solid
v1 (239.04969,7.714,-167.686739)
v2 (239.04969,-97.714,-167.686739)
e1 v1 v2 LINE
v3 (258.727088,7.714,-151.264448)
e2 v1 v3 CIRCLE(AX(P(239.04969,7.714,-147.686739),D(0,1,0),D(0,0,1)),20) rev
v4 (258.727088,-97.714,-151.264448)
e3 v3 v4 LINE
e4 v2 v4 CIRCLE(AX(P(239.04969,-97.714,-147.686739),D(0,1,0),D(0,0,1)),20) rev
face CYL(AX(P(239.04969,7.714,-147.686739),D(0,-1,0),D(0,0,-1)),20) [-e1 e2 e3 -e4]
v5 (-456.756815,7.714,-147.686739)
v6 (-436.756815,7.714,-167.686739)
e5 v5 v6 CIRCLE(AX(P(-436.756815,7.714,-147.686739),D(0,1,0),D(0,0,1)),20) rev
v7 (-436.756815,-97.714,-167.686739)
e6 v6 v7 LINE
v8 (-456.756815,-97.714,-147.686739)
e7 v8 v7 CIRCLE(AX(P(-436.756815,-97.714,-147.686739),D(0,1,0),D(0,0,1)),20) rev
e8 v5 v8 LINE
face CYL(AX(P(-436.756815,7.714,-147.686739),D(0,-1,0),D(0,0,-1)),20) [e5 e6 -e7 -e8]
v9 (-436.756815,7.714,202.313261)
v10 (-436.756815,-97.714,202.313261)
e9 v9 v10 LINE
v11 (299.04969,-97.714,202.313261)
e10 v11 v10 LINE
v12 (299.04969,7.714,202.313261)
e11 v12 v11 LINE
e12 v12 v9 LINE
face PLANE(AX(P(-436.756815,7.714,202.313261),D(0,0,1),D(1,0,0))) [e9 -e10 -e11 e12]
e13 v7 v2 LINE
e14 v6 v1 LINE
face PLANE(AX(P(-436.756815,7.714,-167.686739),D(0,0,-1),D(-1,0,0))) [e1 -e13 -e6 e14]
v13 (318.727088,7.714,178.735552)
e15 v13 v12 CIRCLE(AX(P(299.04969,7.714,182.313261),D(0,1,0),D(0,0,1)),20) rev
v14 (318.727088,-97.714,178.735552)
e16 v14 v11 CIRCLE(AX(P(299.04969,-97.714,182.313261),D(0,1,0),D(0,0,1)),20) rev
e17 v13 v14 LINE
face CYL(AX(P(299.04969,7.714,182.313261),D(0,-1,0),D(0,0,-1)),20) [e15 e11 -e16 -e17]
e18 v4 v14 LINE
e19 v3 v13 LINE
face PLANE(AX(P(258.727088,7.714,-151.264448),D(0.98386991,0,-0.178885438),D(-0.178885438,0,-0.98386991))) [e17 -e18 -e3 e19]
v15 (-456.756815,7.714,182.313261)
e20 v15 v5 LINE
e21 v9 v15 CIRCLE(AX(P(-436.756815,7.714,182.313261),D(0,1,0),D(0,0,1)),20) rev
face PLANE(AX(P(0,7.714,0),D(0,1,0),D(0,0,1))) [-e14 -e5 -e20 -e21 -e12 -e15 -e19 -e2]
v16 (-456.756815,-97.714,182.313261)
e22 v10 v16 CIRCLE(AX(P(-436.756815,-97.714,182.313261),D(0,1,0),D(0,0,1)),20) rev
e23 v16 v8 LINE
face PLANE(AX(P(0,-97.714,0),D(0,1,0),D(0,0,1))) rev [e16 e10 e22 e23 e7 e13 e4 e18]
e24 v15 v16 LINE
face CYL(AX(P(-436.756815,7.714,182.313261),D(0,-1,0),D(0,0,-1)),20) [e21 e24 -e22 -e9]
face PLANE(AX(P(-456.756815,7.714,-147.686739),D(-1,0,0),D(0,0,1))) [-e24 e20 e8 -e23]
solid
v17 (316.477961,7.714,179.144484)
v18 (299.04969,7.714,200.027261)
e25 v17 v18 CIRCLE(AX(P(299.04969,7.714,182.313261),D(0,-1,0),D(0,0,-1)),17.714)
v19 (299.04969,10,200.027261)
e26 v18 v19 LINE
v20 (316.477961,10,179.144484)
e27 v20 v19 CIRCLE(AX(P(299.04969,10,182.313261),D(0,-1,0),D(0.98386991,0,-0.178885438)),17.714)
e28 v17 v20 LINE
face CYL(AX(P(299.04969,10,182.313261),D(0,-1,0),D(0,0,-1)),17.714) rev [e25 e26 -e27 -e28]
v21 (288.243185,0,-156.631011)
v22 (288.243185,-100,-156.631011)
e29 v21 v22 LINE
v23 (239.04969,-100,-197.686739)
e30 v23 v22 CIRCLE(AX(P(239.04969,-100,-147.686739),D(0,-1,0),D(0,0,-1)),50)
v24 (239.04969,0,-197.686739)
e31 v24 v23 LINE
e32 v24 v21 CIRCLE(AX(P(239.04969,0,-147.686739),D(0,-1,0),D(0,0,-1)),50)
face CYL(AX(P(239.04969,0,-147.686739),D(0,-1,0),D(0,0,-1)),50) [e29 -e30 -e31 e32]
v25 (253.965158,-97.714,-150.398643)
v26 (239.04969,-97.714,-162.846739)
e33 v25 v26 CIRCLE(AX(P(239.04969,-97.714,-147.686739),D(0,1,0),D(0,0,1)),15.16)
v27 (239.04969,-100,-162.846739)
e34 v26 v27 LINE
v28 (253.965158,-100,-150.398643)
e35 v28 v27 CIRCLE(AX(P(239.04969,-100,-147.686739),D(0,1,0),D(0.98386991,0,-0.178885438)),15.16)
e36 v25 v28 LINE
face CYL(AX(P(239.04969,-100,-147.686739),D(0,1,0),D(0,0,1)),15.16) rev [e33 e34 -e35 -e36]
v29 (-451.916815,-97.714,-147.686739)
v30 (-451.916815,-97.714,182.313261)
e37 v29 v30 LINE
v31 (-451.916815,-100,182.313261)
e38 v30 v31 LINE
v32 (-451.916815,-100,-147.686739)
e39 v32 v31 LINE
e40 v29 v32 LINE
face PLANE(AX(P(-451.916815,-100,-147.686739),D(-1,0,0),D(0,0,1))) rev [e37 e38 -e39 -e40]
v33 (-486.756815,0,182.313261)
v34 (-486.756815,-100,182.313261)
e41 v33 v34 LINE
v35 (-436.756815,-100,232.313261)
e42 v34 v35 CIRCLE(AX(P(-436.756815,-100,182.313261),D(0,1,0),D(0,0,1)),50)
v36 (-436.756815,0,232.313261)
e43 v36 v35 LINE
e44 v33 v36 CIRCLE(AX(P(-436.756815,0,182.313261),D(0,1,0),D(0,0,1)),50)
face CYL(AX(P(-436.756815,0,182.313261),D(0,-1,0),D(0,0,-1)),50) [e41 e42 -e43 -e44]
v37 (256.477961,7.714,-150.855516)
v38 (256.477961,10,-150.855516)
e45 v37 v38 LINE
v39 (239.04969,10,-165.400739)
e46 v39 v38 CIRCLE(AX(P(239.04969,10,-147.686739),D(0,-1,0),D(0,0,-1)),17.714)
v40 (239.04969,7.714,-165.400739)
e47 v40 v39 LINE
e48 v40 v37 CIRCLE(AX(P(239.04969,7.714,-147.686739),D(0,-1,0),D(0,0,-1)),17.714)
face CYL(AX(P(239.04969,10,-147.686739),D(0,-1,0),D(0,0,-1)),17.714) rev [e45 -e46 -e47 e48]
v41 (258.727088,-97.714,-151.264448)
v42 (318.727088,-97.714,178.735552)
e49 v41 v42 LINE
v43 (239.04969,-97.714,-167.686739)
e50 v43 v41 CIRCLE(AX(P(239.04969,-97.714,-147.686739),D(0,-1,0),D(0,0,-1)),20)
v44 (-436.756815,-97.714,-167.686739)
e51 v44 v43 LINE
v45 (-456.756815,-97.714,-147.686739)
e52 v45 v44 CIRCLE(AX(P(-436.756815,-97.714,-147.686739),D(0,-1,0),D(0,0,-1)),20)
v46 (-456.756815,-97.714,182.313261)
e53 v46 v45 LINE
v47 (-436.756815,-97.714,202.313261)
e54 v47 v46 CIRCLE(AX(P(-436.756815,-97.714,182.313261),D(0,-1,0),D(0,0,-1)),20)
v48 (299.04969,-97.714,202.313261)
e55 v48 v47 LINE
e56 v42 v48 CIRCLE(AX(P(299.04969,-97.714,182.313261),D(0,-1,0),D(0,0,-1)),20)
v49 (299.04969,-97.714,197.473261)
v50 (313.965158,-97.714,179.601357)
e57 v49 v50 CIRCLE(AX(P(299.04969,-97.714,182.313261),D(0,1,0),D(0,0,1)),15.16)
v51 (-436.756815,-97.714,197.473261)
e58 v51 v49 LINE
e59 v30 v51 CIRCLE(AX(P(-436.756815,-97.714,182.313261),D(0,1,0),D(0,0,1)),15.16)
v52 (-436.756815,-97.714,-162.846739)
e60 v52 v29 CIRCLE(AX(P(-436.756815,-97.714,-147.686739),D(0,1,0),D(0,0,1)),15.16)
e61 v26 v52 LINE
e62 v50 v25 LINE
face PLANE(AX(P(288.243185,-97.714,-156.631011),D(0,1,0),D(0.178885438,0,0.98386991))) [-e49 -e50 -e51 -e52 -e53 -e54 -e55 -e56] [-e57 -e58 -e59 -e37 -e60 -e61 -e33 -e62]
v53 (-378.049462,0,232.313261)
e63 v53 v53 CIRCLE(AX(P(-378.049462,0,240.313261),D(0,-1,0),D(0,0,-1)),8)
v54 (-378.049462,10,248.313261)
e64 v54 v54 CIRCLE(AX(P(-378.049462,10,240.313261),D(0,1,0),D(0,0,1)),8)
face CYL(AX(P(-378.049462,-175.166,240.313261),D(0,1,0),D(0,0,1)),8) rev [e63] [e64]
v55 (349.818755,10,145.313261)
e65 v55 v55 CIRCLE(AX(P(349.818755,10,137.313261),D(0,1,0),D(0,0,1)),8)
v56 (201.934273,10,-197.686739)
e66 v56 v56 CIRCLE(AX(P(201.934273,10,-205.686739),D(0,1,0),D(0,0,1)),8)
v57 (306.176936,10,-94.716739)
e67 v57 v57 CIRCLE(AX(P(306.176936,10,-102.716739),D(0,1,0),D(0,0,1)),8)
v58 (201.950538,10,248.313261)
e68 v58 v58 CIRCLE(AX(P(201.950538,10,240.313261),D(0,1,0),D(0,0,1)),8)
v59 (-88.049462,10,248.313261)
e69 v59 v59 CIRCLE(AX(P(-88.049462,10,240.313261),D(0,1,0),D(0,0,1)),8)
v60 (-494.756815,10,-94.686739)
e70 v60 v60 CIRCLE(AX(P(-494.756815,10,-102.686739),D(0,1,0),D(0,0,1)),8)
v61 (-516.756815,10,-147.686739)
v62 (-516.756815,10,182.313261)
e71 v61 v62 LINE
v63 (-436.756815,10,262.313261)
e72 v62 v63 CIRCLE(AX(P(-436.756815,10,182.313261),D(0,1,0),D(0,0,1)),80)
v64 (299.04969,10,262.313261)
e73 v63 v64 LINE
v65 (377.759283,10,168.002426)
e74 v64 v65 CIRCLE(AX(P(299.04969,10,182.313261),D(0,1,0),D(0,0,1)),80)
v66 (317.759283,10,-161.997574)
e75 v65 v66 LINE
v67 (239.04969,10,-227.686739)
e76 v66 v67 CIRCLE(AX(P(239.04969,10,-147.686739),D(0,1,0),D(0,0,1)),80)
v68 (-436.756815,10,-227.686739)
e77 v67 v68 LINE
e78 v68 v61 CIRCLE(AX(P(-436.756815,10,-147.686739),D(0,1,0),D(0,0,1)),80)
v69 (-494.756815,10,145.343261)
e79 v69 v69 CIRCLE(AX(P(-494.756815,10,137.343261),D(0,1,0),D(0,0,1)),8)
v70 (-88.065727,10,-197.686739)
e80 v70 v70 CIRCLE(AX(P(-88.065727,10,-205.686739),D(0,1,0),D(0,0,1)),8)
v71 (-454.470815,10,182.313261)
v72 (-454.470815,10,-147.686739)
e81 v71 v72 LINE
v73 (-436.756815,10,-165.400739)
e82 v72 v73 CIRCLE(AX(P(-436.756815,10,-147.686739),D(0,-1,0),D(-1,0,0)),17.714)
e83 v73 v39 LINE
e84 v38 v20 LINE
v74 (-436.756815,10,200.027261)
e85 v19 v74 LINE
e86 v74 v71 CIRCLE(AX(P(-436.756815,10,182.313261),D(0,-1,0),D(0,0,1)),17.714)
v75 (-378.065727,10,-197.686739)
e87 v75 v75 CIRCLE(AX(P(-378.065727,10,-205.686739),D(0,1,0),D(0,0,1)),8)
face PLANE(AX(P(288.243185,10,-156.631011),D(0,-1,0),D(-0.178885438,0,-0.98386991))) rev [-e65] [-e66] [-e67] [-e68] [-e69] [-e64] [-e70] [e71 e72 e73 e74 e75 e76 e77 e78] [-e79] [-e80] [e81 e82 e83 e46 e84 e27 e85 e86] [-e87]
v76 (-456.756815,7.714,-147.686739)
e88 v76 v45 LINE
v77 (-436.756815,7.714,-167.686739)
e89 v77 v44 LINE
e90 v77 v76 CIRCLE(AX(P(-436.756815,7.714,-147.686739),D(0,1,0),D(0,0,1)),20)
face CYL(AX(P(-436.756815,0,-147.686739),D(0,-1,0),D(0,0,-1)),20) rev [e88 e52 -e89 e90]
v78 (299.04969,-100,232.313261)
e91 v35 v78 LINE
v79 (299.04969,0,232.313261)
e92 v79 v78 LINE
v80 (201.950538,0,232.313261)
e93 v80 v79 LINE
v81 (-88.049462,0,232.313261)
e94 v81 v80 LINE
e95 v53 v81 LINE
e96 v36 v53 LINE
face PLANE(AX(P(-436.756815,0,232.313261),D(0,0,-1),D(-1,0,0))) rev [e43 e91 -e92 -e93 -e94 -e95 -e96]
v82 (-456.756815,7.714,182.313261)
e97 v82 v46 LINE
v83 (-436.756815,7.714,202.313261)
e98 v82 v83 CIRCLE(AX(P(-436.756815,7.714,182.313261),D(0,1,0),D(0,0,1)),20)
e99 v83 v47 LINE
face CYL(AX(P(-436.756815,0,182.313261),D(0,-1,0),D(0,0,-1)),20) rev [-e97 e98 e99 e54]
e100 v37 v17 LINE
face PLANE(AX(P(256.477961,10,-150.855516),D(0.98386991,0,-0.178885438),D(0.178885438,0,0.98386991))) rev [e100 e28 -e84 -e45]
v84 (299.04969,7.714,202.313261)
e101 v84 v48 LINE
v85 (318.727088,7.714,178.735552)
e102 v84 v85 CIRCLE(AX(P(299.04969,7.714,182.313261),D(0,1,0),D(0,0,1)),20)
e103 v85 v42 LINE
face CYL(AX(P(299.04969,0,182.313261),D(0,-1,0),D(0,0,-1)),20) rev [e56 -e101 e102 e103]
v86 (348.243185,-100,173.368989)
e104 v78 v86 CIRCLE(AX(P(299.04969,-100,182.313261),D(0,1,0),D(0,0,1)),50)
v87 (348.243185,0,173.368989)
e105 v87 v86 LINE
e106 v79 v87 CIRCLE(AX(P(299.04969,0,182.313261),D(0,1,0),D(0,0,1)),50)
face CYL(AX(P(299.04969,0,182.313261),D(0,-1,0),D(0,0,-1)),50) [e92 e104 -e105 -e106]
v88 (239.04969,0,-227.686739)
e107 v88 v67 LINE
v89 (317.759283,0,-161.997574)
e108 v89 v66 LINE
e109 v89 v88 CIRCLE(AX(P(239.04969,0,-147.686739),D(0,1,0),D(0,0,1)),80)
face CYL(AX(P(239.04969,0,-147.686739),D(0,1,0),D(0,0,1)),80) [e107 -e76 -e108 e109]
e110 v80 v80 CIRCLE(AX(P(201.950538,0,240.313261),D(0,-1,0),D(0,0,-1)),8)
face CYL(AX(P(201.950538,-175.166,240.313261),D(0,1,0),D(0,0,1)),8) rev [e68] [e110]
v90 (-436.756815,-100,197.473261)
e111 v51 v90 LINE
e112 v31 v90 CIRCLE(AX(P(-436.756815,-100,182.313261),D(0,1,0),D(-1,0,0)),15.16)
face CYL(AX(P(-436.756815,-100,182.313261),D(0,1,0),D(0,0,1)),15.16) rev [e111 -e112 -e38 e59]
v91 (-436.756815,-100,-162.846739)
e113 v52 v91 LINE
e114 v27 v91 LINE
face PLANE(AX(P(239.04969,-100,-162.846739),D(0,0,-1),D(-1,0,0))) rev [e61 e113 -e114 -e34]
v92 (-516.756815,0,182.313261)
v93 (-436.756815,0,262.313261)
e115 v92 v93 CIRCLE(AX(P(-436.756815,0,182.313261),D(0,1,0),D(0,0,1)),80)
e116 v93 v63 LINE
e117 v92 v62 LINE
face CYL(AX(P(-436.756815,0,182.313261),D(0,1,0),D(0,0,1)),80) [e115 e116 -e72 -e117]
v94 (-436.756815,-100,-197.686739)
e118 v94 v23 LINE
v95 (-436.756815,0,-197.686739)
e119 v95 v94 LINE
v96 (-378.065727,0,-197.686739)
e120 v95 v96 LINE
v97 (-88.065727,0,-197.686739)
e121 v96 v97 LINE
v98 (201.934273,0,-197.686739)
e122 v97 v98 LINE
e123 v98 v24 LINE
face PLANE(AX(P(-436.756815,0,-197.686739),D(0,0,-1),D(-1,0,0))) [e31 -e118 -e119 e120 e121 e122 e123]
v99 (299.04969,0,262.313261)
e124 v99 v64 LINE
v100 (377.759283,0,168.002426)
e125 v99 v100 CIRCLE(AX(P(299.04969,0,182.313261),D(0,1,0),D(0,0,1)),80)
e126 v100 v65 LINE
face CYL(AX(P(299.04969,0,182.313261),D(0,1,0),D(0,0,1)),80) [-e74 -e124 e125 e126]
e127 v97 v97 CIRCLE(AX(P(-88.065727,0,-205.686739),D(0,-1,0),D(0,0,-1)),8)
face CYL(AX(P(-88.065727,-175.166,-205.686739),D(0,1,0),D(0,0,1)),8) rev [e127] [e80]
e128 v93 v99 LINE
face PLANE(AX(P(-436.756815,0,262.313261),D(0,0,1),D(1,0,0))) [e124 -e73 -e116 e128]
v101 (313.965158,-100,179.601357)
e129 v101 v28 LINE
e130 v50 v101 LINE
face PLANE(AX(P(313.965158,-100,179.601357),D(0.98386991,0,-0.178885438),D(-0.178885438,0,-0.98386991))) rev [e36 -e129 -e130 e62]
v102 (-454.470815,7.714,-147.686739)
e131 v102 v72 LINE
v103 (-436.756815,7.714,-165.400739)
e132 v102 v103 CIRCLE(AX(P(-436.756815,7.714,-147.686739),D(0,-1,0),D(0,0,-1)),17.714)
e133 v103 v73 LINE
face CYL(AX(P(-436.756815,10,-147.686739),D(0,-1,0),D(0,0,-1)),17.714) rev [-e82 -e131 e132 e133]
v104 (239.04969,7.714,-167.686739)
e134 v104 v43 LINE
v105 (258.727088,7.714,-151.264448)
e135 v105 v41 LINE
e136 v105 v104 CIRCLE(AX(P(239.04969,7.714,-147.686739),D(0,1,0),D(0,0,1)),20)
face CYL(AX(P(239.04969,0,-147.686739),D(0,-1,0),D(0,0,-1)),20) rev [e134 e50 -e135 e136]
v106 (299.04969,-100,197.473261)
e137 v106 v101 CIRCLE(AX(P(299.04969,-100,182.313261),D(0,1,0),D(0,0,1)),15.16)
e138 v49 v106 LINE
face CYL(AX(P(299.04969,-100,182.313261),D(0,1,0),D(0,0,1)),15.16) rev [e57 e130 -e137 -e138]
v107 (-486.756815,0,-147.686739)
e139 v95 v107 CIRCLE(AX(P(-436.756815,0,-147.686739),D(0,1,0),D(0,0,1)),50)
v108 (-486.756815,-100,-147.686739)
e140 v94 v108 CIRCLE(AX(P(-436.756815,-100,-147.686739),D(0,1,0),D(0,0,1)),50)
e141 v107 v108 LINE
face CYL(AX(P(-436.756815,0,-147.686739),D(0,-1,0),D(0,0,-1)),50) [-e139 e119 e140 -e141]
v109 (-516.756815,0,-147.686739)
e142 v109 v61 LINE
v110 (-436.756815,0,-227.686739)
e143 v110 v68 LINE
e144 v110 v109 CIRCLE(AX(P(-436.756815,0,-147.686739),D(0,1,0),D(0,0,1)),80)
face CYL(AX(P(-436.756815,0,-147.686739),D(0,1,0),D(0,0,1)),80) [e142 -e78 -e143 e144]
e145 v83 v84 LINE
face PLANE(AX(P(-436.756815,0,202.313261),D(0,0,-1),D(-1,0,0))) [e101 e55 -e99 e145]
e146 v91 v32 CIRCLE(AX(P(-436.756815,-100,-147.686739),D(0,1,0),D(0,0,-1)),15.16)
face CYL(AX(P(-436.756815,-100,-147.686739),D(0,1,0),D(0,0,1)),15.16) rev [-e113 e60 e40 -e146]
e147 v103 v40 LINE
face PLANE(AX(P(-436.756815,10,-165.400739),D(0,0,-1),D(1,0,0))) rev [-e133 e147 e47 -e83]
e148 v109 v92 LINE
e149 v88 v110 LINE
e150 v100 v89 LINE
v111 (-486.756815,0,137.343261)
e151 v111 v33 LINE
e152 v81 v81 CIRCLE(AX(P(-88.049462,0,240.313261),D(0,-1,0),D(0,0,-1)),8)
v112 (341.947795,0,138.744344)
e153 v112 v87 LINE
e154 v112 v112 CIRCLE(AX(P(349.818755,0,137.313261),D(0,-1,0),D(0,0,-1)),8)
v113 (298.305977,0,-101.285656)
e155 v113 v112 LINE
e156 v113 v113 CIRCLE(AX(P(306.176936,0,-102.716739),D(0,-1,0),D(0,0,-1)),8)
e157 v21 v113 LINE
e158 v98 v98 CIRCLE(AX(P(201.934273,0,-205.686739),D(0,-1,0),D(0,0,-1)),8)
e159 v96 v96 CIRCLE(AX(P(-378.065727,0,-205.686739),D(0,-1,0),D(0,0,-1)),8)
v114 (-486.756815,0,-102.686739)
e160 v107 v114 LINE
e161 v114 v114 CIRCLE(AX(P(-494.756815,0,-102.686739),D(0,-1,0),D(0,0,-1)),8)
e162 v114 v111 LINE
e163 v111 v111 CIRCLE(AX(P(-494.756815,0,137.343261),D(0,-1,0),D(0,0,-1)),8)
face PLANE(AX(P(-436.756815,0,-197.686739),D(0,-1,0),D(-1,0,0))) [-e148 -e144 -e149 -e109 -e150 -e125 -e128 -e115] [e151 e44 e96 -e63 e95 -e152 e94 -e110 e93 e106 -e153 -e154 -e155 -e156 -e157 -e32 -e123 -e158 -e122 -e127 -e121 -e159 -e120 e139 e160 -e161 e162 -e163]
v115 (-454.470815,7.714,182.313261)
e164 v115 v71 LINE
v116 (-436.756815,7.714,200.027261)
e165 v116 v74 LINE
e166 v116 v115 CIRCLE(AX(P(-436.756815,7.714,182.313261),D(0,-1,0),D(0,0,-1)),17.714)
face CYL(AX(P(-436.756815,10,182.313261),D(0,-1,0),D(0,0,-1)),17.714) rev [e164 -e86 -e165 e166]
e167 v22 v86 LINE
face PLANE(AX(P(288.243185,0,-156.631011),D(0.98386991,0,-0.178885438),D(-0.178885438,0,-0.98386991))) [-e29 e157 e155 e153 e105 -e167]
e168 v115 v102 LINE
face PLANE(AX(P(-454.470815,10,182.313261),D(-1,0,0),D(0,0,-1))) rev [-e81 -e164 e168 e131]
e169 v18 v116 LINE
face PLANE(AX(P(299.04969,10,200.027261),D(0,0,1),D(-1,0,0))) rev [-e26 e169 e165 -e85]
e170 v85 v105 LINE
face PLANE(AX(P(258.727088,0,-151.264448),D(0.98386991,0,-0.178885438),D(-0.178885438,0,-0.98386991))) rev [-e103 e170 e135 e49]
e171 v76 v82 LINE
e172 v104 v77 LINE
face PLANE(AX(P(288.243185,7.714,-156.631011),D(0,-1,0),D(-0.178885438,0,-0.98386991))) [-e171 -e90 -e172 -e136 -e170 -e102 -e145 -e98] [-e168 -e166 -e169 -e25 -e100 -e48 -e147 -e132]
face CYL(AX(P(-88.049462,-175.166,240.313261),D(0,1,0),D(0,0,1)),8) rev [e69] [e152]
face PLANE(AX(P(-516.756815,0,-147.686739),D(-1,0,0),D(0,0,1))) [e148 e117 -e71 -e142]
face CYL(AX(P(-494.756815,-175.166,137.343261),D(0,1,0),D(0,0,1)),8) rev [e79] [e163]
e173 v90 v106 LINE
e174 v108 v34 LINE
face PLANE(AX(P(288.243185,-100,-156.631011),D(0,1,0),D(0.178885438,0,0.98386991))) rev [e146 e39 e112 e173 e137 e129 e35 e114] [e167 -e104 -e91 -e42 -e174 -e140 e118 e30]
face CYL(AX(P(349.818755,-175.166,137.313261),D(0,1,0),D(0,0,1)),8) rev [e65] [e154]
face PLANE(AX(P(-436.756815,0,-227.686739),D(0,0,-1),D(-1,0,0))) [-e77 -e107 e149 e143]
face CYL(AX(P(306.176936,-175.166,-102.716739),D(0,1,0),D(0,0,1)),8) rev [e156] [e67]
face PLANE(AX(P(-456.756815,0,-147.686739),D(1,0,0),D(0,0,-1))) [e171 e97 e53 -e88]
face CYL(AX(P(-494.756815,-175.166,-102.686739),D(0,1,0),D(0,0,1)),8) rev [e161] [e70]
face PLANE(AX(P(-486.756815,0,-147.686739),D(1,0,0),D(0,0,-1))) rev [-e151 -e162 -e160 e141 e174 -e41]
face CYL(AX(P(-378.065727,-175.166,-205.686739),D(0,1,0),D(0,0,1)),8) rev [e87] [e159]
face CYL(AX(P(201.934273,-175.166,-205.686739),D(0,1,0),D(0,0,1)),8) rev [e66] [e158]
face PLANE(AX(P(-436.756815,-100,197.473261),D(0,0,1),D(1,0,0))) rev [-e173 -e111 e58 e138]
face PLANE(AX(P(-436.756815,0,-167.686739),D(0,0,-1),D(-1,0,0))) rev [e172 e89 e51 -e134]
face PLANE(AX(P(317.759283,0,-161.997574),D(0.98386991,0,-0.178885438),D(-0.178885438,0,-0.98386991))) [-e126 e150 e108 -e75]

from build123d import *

# Parameters (mm, degrees)
SURFACE_EXTRUDE1_1_BACK  = 100
SURFACE_EXTRUDE1_1_DEPTH = 100
THICKEN1_T1              = 30
SURFACE_EXTRUDE2_2_DEPTH = 10
THICKEN2_T1              = 30
THICKEN2_T2              = 30
SKETCH3_R                = 8
CUT_EXTRUDE1_DEPTH       = 185.166
THICKEN3_START           = -100
THICKEN3_DEPTH           = 2.286
THICKEN4_START           = 7.714
THICKEN4_DEPTH           = 2.286
THICKEN8_START           = -97.714
THICKEN8_DEPTH           = 105.427999964


# Read off the part's stored shape, not the designer's step: Thicken3, Thicken4, Thicken8
with BuildPart() as body_1:
    # Surface-Extrude1: a surface, the sketch's curves swept straight by 100 mm
    with BuildLine(Plane(origin=(0, 0, 0), x_dir=(1, 0, 0), z_dir=(0, 1, 0)).offset(-SURFACE_EXTRUDE1_1_BACK), mode=Mode.PRIVATE) as surface_extrude1_1_path:
        Line((-486.756814761, 147.686739346), (-486.756814761, -182.313260654))
        ThreePointArc((-486.756814761, -182.313260654), (-472.112153821, -217.668599714), (-436.756814761, -232.313260654))
        Line((-436.756814761, -232.313260654), (299.049689734, -232.313260654))
        ThreePointArc((299.049689734, -232.313260654), (337.43727624, -214.350632617), (348.243185239, -173.368988744))
        Line((348.243185239, -173.368988744), (288.243185239, 156.631011256))
        ThreePointArc((288.243185239, 156.631011256), (271.087061696, 186.074325852), (239.049689734, 197.686739346))
        Line((239.049689734, 197.686739346), (-436.756814761, 197.686739346))
        ThreePointArc((-436.756814761, 197.686739346), (-472.112153821, 183.042078405), (-486.756814761, 147.686739346))
    surface_extrude1_1 = Shell.extrude(surface_extrude1_1_path.wire(), (0 * SURFACE_EXTRUDE1_1_DEPTH, 1 * SURFACE_EXTRUDE1_1_DEPTH, 0 * SURFACE_EXTRUDE1_1_DEPTH))
    add(Solid.thicken(surface_extrude1_1, THICKEN1_T1))

    # Surface-Extrude2: a surface, the sketch's curves swept straight by 10 mm
    with BuildLine(Plane(origin=(0, 0, 0), x_dir=(1, 0, 0), z_dir=(0, 1, 0)), mode=Mode.PRIVATE) as surface_extrude2_2_path:
        Line((-486.756814761, 147.686739346), (-486.756814761, -182.313260654))
        ThreePointArc((-486.756814761, -182.313260654), (-472.112153821, -217.668599714), (-436.756814761, -232.313260654))
        Line((-436.756814761, -232.313260654), (299.049689734, -232.313260654))
        ThreePointArc((299.049689734, -232.313260654), (337.43727624, -214.350632617), (348.243185239, -173.368988744))
        Line((348.243185239, -173.368988744), (288.243185239, 156.631011256))
        ThreePointArc((288.243185239, 156.631011256), (271.087061696, 186.074325852), (239.049689734, 197.686739346))
        Line((239.049689734, 197.686739346), (-436.756814761, 197.686739346))
        ThreePointArc((-436.756814761, 197.686739346), (-472.112153821, 183.042078405), (-486.756814761, 147.686739346))
    surface_extrude2_2 = Shell.extrude(surface_extrude2_2_path.wire(), (0 * SURFACE_EXTRUDE2_2_DEPTH, 1 * SURFACE_EXTRUDE2_2_DEPTH, 0 * SURFACE_EXTRUDE2_2_DEPTH))
    add(Solid.thicken(surface_extrude2_2, THICKEN2_T1))
    add(Solid.thicken(surface_extrude2_2, -THICKEN2_T2))

    # Sketch3 → Cut-Extrude1 (cut)
    with BuildSketch(Plane(origin=(0, 10, 0), x_dir=(1, 0, 0), z_dir=(0, 1, 0))):
        with Locations(Location((-378.065726857, 205.686739346, 0), (0, 0, 270))):
            Circle(SKETCH3_R)
        with Locations(Location((-88.065726857, 205.686739346, 0), (0, 0, 270))):
            Circle(SKETCH3_R)
        with Locations(Location((201.934273143, 205.686739346, 0), (0, 0, 270))):
            Circle(SKETCH3_R)
        with Locations(Location((-494.756814761, 102.686739346, 0), (0, 0, 270))):
            Circle(SKETCH3_R)
        with Locations(Location((-494.756814761, -137.343260654, 0), (0, 0, 270))):
            Circle(SKETCH3_R)
        with Locations(Location((-378.049461671, -240.313260654, 0), (0, 0, 270))):
            Circle(SKETCH3_R)
        with Locations(Location((-88.049461789, -240.313260654, 0), (0, 0, 270))):
            Circle(SKETCH3_R)
        with Locations(Location((201.950538093, -240.313260654, 0), (0, 0, 270))):
            Circle(SKETCH3_R)
        with Locations(Location((306.176936413, 102.716739346, 0), (0, 0, 270))):
            Circle(SKETCH3_R)
        with Locations(Location((349.818754595, -137.313260654, 0), (0, 0, 270))):
            Circle(SKETCH3_R)
    extrude(amount=-CUT_EXTRUDE1_DEPTH, mode=Mode.SUBTRACT)

    # Thicken3 outline → Thicken3 (add)
    with BuildSketch(Plane(origin=(0, 0, 0), x_dir=(1, 0, 0), z_dir=(0, 1, 0)).offset(THICKEN3_START)):
        with BuildLine():
            ThreePointArc((299.049689734, -202.313260654), (314.404724336, -195.128209439), (318.727087936, -178.73555189))
            Line((318.727087936, -178.73555189), (258.727087936, 151.26444811))
            ThreePointArc((258.727087936, 151.26444811), (251.864638519, 163.041773948), (239.049689734, 167.686739346))
            Line((239.049689734, 167.686739346), (-436.756814761, 167.686739346))
            ThreePointArc((-436.756814761, 167.686739346), (-450.898950384, 161.828874969), (-456.756814761, 147.686739346))
            Line((-456.756814761, 147.686739346), (-456.756814761, -182.313260654))
            ThreePointArc((-456.756814761, -182.313260654), (-450.898950385, -196.455396278), (-436.756814761, -202.313260654))
            Line((-436.756814761, -202.313260654), (299.049689734, -202.313260654))
        make_face()
        with BuildLine():
            ThreePointArc((239.049689734, 162.846739374), (248.763420931, 159.325855596), (253.965157598, 150.398642594))
            Line((253.965157598, 150.398642594), (313.965157598, -179.601357406))
            ThreePointArc((313.965157598, -179.601357406), (310.688805984, -192.026991851), (299.049689734, -197.473260682))
            Line((299.049689734, -197.473260682), (-436.756814761, -197.473260682))
            ThreePointArc((-436.756814761, -197.473260682), (-447.476553584, -193.032999477), (-451.916814789, -182.313260654))
            Line((-451.916814789, -182.313260654), (-451.916814789, 147.686739346))
            ThreePointArc((-451.916814789, 147.686739346), (-447.476553583, 158.406478169), (-436.756814761, 162.846739374))
            Line((-436.756814761, 162.846739374), (239.049689734, 162.846739374))
        make_face(mode=Mode.SUBTRACT)
    extrude(amount=THICKEN3_DEPTH)

    # Thicken4 outline → Thicken4 (add)
    with BuildSketch(Plane(origin=(0, 0, 0), x_dir=(1, 0, 0), z_dir=(0, 1, 0)).offset(THICKEN4_START)):
        with BuildLine():
            ThreePointArc((299.049689734, -202.313260654), (314.404724336, -195.128209439), (318.727087936, -178.73555189))
            Line((318.727087936, -178.73555189), (258.727087936, 151.26444811))
            ThreePointArc((258.727087936, 151.26444811), (251.864638519, 163.041773948), (239.049689734, 167.686739346))
            Line((239.049689734, 167.686739346), (-436.756814761, 167.686739346))
            ThreePointArc((-436.756814761, 167.686739346), (-450.898950384, 161.828874969), (-456.756814761, 147.686739346))
            Line((-456.756814761, 147.686739346), (-456.756814761, -182.313260654))
            ThreePointArc((-456.756814761, -182.313260654), (-450.898950385, -196.455396278), (-436.756814761, -202.313260654))
            Line((-436.756814761, -202.313260654), (299.049689734, -202.313260654))
        make_face()
        with BuildLine():
            Line((256.477961321, 150.855515998), (316.477961321, -179.144484002))
            ThreePointArc((316.477961321, -179.144484002), (312.649643881, -193.663460793), (299.049689734, -200.027260654))
            Line((299.049689734, -200.027260654), (-436.756814761, -200.027260654))
            ThreePointArc((-436.756814761, -200.027260654), (-449.282504283, -194.838950176), (-454.470814761, -182.313260654))
            Line((-454.470814761, -182.313260654), (-454.470814761, 147.686739346))
            ThreePointArc((-454.470814761, 147.686739346), (-449.282504283, 160.212428868), (-436.756814761, 165.400739346))
            Line((-436.756814761, 165.400739346), (239.049689734, 165.400739346))
            ThreePointArc((239.049689734, 165.400739346), (250.399889873, 161.286693493), (256.477961321, 150.855515998))
        make_face(mode=Mode.SUBTRACT)
    extrude(amount=THICKEN4_DEPTH)


with BuildPart() as body_2:
    # Thicken8 outline → Thicken8 (new body)
    with BuildSketch(Plane(origin=(0, 0, 0), x_dir=(1, 0, 0), z_dir=(0, 1, 0)).offset(THICKEN8_START)):
        with BuildLine():
            ThreePointArc((-436.756814761, 167.686739346), (-450.898950384, 161.828874969), (-456.756814761, 147.686739346))
            Line((-456.756814761, 147.686739346), (-456.756814761, -182.313260654))
            ThreePointArc((-456.756814761, -182.313260654), (-450.898950385, -196.455396278), (-436.756814761, -202.313260654))
            Line((-436.756814761, -202.313260654), (299.049689734, -202.313260654))
            ThreePointArc((299.049689734, -202.313260654), (314.404724336, -195.128209439), (318.727087936, -178.73555189))
            Line((318.727087936, -178.73555189), (258.727087936, 151.26444811))
            ThreePointArc((258.727087936, 151.26444811), (251.864638519, 163.041773948), (239.049689734, 167.686739346))
            Line((239.049689734, 167.686739346), (-436.756814761, 167.686739346))
        make_face()
    extrude(amount=THICKEN8_DEPTH)


solid = Compound([body_1.part, body_2.part])
